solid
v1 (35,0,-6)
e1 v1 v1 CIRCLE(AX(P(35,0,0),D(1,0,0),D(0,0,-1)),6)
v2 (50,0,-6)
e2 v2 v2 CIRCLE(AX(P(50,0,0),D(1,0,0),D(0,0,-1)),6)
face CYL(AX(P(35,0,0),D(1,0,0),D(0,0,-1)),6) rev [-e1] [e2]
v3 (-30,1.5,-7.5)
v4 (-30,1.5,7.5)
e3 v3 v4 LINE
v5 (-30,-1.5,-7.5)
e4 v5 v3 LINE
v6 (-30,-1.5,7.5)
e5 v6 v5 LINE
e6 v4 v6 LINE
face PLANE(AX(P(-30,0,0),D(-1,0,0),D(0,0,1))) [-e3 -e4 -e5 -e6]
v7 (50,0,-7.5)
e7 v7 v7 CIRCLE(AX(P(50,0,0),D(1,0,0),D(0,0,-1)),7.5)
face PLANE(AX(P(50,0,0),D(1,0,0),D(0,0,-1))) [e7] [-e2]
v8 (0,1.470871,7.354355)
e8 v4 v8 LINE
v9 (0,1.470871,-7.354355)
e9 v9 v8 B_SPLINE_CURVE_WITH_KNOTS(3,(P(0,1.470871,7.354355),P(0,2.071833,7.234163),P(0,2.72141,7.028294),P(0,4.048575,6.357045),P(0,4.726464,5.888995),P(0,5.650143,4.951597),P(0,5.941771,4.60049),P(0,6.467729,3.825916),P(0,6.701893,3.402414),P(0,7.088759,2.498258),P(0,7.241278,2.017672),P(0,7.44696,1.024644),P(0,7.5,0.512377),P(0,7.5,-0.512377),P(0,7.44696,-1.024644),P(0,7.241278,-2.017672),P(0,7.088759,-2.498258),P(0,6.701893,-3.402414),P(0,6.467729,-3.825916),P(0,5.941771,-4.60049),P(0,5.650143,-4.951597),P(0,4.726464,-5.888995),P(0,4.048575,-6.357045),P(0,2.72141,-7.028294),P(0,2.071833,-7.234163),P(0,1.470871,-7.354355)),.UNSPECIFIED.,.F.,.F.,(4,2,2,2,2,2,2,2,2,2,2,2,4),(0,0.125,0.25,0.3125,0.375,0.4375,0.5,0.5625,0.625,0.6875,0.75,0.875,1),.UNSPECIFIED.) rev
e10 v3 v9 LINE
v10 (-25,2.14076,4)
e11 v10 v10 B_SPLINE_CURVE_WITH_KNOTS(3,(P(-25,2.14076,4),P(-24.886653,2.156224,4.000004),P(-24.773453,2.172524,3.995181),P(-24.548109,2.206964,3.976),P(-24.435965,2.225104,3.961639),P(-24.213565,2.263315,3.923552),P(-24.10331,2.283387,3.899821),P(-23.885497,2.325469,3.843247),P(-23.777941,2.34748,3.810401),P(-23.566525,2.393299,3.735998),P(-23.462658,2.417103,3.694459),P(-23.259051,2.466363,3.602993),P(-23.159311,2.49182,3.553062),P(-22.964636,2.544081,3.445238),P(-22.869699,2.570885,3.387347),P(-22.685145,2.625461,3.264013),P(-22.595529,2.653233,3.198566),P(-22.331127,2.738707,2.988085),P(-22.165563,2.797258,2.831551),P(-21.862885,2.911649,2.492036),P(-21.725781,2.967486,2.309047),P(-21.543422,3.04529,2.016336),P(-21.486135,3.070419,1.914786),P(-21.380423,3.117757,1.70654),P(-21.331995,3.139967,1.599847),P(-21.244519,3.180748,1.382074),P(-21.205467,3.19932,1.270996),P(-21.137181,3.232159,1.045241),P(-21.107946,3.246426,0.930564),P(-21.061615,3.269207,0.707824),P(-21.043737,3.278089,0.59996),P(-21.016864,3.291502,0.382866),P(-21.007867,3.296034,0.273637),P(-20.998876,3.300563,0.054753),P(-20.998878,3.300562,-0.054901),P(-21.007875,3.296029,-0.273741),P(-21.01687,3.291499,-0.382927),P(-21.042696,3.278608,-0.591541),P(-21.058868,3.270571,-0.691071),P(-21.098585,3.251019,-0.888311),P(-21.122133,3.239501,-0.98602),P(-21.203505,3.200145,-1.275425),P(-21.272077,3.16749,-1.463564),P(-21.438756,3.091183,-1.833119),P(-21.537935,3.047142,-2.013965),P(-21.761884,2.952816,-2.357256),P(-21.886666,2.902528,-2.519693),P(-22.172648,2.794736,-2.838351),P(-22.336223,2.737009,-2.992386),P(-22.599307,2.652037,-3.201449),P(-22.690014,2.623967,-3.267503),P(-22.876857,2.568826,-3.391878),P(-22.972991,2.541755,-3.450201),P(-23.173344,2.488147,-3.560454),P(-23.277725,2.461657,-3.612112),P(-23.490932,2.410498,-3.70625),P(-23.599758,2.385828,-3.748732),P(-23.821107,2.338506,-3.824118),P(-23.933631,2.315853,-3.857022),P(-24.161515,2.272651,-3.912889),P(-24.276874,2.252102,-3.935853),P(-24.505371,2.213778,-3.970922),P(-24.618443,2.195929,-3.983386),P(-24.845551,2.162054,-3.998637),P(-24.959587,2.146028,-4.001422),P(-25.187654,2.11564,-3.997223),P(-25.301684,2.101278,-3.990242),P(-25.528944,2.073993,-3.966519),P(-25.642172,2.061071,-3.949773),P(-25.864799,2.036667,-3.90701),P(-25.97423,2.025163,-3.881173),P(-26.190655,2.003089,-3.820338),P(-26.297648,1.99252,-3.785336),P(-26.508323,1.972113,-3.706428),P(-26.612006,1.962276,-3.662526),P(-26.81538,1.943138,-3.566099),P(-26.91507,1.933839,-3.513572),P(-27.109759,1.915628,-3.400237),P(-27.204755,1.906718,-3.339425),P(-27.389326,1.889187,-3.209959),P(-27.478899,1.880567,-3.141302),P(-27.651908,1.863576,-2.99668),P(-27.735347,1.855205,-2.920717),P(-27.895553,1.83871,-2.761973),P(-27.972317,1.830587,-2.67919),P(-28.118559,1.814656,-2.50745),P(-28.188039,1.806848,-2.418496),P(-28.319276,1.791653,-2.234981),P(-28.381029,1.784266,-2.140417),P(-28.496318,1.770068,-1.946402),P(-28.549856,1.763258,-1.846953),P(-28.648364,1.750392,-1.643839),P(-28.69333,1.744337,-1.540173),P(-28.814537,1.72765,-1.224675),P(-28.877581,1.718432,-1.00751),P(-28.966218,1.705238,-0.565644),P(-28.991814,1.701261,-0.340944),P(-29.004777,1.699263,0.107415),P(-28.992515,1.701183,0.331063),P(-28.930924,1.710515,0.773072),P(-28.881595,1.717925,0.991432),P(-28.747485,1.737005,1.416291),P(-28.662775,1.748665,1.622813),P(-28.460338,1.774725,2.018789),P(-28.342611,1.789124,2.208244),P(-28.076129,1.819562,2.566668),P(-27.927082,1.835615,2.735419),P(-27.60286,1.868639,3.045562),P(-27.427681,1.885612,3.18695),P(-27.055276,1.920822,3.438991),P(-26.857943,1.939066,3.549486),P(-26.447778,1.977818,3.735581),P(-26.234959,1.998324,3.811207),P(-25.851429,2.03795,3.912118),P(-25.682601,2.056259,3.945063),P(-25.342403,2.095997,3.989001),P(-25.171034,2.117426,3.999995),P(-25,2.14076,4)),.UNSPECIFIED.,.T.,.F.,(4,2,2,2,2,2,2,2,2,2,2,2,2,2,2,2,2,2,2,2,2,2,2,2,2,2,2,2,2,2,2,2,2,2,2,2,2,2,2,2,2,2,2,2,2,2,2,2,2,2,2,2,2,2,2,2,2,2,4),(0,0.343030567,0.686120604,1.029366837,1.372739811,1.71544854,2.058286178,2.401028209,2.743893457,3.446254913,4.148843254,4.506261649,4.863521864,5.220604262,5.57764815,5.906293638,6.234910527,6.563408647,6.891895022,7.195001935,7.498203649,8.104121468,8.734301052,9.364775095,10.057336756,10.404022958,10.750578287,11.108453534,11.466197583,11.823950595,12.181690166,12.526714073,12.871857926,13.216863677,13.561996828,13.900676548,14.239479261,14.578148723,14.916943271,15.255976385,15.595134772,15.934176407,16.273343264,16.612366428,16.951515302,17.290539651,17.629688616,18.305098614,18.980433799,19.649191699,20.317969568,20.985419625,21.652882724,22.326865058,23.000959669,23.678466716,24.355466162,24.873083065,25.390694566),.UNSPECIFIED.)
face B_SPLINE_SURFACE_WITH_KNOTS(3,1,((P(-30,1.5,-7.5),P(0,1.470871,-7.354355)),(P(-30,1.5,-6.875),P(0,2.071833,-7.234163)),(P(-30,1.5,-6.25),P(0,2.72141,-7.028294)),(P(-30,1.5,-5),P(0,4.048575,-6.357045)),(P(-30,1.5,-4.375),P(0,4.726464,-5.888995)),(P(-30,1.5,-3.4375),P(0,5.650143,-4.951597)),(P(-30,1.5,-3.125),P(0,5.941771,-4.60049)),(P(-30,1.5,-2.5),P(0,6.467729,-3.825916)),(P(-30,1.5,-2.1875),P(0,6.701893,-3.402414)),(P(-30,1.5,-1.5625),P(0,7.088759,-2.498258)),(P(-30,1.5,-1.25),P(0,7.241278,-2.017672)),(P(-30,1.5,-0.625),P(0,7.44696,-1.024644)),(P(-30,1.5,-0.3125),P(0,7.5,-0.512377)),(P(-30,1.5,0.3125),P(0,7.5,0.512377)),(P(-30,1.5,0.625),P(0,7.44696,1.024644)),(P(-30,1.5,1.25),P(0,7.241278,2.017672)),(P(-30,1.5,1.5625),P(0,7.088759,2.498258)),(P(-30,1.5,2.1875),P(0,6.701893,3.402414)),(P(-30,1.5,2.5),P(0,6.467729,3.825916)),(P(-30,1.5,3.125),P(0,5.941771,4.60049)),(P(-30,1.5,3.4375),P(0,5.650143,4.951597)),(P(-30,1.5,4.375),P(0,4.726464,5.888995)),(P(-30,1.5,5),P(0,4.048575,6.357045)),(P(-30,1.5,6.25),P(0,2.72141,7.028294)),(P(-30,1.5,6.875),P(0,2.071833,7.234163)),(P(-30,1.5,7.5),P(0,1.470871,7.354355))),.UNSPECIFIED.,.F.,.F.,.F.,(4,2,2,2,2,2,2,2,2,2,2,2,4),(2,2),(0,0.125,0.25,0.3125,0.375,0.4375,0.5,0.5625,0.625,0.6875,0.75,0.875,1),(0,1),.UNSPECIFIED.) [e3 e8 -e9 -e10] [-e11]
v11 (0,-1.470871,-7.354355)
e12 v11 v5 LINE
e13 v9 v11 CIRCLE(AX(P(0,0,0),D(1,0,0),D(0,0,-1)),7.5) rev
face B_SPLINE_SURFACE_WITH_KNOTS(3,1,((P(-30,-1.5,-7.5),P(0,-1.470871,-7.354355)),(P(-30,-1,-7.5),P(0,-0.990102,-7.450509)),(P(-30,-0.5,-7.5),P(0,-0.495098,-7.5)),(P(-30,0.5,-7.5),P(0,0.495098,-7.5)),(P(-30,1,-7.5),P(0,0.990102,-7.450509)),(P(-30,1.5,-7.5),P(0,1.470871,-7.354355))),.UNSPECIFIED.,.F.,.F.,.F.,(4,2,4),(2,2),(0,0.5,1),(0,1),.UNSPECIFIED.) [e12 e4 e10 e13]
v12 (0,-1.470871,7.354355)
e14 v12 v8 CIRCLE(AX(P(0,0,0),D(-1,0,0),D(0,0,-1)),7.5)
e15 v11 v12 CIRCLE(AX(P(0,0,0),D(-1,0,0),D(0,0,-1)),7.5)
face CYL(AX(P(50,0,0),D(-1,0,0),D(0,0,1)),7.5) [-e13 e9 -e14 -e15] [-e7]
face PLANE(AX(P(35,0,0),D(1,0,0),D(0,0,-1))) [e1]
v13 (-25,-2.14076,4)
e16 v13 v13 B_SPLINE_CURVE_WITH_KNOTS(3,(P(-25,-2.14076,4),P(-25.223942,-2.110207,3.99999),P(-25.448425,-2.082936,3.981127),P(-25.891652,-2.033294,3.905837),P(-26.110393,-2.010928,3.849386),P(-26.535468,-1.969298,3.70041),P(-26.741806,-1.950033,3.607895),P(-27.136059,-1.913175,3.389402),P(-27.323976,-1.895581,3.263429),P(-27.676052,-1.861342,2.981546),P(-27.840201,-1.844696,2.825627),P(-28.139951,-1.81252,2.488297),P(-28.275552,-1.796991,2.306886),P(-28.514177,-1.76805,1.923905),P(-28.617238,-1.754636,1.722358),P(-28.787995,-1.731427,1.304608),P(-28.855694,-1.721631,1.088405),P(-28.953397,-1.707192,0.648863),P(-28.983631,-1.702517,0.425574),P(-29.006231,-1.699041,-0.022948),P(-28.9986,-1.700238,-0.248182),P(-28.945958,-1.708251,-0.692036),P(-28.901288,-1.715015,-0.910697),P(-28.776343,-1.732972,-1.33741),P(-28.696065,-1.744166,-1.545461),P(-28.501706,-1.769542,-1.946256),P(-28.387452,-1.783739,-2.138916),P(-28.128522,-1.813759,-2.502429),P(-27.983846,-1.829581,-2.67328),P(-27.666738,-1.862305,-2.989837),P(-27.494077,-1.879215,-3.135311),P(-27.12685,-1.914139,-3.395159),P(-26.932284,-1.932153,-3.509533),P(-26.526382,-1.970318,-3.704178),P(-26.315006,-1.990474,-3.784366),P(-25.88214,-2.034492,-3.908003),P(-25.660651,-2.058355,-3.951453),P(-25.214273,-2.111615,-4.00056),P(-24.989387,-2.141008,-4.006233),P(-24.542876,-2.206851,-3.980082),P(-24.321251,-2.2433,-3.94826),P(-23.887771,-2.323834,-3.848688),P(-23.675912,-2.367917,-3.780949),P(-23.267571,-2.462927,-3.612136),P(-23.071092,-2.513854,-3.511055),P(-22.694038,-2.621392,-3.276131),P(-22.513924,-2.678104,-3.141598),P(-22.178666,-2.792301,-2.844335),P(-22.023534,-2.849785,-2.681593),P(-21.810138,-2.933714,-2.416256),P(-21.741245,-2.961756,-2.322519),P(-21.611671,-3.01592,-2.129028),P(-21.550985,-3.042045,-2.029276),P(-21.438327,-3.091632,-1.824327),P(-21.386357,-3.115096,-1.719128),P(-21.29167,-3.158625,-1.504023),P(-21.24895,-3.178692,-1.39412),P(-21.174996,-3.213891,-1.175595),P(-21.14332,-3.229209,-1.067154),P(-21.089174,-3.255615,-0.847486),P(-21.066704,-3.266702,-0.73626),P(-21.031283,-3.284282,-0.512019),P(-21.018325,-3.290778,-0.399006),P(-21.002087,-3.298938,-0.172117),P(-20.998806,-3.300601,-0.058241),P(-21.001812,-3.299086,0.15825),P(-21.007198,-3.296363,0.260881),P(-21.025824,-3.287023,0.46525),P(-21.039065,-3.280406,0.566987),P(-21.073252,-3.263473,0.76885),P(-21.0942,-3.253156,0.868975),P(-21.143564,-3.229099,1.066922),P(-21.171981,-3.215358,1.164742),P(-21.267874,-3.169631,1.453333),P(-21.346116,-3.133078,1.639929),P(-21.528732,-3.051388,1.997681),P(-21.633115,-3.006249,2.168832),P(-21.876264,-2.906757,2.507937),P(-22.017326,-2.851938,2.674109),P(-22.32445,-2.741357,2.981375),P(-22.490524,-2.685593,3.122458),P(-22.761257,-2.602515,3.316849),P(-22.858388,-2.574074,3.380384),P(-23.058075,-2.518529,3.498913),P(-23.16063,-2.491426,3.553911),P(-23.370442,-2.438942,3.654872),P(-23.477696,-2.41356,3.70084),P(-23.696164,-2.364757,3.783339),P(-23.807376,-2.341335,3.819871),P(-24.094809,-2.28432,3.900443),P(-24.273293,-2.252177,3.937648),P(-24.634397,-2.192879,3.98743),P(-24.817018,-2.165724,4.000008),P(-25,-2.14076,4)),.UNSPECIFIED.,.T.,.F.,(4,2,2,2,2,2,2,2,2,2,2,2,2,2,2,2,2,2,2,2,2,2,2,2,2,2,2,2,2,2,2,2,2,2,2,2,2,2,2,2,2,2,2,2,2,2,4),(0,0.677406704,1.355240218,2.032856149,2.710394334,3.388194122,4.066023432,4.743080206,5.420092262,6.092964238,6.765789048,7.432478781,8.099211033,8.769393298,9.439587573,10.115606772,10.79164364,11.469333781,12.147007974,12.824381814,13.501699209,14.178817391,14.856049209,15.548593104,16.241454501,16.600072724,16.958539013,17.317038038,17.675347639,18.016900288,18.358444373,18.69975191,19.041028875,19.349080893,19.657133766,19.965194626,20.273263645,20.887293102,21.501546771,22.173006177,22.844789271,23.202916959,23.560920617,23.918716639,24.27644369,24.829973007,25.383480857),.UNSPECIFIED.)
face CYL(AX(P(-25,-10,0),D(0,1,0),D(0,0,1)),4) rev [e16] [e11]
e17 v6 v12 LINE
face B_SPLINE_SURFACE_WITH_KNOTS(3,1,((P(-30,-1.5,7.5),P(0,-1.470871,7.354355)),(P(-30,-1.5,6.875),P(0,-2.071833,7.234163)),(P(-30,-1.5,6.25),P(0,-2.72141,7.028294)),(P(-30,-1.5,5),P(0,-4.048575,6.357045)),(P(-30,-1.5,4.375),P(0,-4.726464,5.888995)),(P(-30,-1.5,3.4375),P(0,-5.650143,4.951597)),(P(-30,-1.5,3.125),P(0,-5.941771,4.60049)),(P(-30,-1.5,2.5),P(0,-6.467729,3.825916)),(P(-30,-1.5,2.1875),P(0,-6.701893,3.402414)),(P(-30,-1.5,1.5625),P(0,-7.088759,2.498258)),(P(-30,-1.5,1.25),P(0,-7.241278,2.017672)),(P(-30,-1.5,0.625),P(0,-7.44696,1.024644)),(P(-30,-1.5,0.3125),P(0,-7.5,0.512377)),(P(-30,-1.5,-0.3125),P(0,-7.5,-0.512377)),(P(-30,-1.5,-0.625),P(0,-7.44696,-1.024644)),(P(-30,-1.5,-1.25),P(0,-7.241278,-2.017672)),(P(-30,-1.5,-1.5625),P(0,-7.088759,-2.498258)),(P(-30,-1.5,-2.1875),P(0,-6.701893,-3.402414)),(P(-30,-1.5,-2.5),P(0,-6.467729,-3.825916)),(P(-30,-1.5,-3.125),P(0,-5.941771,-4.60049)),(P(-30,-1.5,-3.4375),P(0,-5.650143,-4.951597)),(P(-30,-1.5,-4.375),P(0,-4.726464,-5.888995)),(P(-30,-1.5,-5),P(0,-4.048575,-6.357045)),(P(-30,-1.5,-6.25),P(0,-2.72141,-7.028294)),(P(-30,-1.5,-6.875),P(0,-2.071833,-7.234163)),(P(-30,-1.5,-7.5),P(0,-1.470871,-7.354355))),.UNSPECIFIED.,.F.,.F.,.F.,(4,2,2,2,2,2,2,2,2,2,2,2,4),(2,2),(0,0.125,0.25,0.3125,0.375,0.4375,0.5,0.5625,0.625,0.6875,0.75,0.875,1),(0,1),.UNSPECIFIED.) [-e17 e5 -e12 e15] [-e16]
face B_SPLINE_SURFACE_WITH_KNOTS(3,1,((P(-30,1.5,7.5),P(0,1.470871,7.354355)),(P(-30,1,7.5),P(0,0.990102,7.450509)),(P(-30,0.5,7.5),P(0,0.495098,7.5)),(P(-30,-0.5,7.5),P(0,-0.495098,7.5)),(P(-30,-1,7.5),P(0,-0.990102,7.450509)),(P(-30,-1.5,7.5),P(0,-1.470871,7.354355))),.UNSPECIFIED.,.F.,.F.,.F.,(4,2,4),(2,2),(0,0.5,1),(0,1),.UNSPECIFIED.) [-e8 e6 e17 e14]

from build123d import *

# Parameters (mm, degrees)
SKETCH1_R           = 7.5
BOSS_EXTRUDE1_DEPTH = 50
SKETCH6_R           = 4
CUT_EXTRUDE1_DEPTH  = 10
SKETCH7_R           = 6
CUT_EXTRUDE2_DEPTH  = 15


with BuildPart() as part:
    # Sketch1 → Boss-Extrude1 (new body)
    with BuildSketch(Plane(origin=(0, 0, 0), x_dir=(0, 0, -1), z_dir=(1, 0, 0))):
        Circle(SKETCH1_R)
    extrude(amount=BOSS_EXTRUDE1_DEPTH)

    # Loft1: read off the stored shape, not the designer's step
    # Loft1: loft between two sections, ruled curve by curve
    loft1_from = [
        Edge.make_bspline([(-30, -1.5, -7.5), (-30, -1, -7.5), (-30, -0.5, -7.5), (-30, 0.5, -7.5), (-30, 1, -7.5), (-30, 1.5, -7.5)], [0, 0, 0, 0, 0.5, 0.5, 1, 1, 1, 1], 3),
        Edge.make_bspline([(-30, 1.5, -7.5), (-30, 1.5, -6.875), (-30, 1.5, -6.25), (-30, 1.5, -5), (-30, 1.5, -4.375), (-30, 1.5, -3.4375), (-30, 1.5, -3.125), (-30, 1.5, -2.5), (-30, 1.5, -2.1875), (-30, 1.5, -1.5625), (-30, 1.5, -1.25), (-30, 1.5, -0.625), (-30, 1.5, -0.3125), (-30, 1.5, 0.3125), (-30, 1.5, 0.625), (-30, 1.5, 1.25), (-30, 1.5, 1.5625), (-30, 1.5, 2.1875), (-30, 1.5, 2.5), (-30, 1.5, 3.125), (-30, 1.5, 3.4375), (-30, 1.5, 4.375), (-30, 1.5, 5), (-30, 1.5, 6.25), (-30, 1.5, 6.875), (-30, 1.5, 7.5)], [0, 0, 0, 0, 0.125, 0.125, 0.25, 0.25, 0.3125, 0.3125, 0.375, 0.375, 0.4375, 0.4375, 0.5, 0.5, 0.5625, 0.5625, 0.625, 0.625, 0.6875, 0.6875, 0.75, 0.75, 0.875, 0.875, 1, 1, 1, 1], 3),
        Edge.make_bspline([(-30, -1.5, 7.5), (-30, -1.5, 6.875), (-30, -1.5, 6.25), (-30, -1.5, 5), (-30, -1.5, 4.375), (-30, -1.5, 3.4375), (-30, -1.5, 3.125), (-30, -1.5, 2.5), (-30, -1.5, 2.1875), (-30, -1.5, 1.5625), (-30, -1.5, 1.25), (-30, -1.5, 0.625), (-30, -1.5, 0.3125), (-30, -1.5, -0.3125), (-30, -1.5, -0.625), (-30, -1.5, -1.25), (-30, -1.5, -1.5625), (-30, -1.5, -2.1875), (-30, -1.5, -2.5), (-30, -1.5, -3.125), (-30, -1.5, -3.4375), (-30, -1.5, -4.375), (-30, -1.5, -5), (-30, -1.5, -6.25), (-30, -1.5, -6.875), (-30, -1.5, -7.5)], [0, 0, 0, 0, 0.125, 0.125, 0.25, 0.25, 0.3125, 0.3125, 0.375, 0.375, 0.4375, 0.4375, 0.5, 0.5, 0.5625, 0.5625, 0.625, 0.625, 0.6875, 0.6875, 0.75, 0.75, 0.875, 0.875, 1, 1, 1, 1], 3),
        Edge.make_bspline([(-30, 1.5, 7.5), (-30, 1, 7.5), (-30, 0.5, 7.5), (-30, -0.5, 7.5), (-30, -1, 7.5), (-30, -1.5, 7.5)], [0, 0, 0, 0, 0.5, 0.5, 1, 1, 1, 1], 3),
    ]
    loft1_to = [
        Edge.make_bspline([(0, -1.470871014, -7.354355068), (0, -0.990101783, -7.450508914), (0, -0.495097568, -7.5), (0, 0.495097568, -7.5), (0, 0.990101783, -7.450508914), (0, 1.470871014, -7.354355068)], [0, 0, 0, 0, 0.5, 0.5, 1, 1, 1, 1], 3),
        Edge.make_bspline([(0, 1.470871014, -7.354355068), (0, 2.071832552, -7.23416276), (0, 2.721409951, -7.028293774), (0, 4.048575149, -6.357045286), (0, 4.726464289, -5.888995469), (0, 5.65014307, -4.951597355), (0, 5.941771026, -4.600489776), (0, 6.467728892, -3.825915851), (0, 6.701892794, -3.402414461), (0, 7.088758699, -2.498257653), (0, 7.24127756, -2.017672373), (0, 7.446959564, -1.024644209), (0, 7.5, -0.512377439), (0, 7.5, 0.512377439), (0, 7.446959564, 1.024644209), (0, 7.24127756, 2.017672373), (0, 7.088758699, 2.498257653), (0, 6.701892794, 3.402414461), (0, 6.467728892, 3.825915851), (0, 5.941771026, 4.600489776), (0, 5.65014307, 4.951597355), (0, 4.726464289, 5.888995469), (0, 4.048575149, 6.357045286), (0, 2.721409951, 7.028293774), (0, 2.071832552, 7.23416276), (0, 1.470871014, 7.354355068)], [0, 0, 0, 0, 0.125, 0.125, 0.25, 0.25, 0.3125, 0.3125, 0.375, 0.375, 0.4375, 0.4375, 0.5, 0.5, 0.5625, 0.5625, 0.625, 0.625, 0.6875, 0.6875, 0.75, 0.75, 0.875, 0.875, 1, 1, 1, 1], 3),
        Edge.make_bspline([(0, -1.470871014, 7.354355068), (0, -2.071832552, 7.23416276), (0, -2.721409951, 7.028293774), (0, -4.048575149, 6.357045286), (0, -4.726464289, 5.888995469), (0, -5.65014307, 4.951597355), (0, -5.941771026, 4.600489776), (0, -6.467728892, 3.825915851), (0, -6.701892794, 3.402414461), (0, -7.088758699, 2.498257653), (0, -7.24127756, 2.017672373), (0, -7.446959564, 1.024644209), (0, -7.5, 0.512377439), (0, -7.5, -0.512377439), (0, -7.446959564, -1.024644209), (0, -7.24127756, -2.017672373), (0, -7.088758699, -2.498257653), (0, -6.701892794, -3.402414461), (0, -6.467728892, -3.825915851), (0, -5.941771026, -4.600489776), (0, -5.65014307, -4.951597355), (0, -4.726464289, -5.888995469), (0, -4.048575149, -6.357045286), (0, -2.721409951, -7.028293774), (0, -2.071832552, -7.23416276), (0, -1.470871014, -7.354355068)], [0, 0, 0, 0, 0.125, 0.125, 0.25, 0.25, 0.3125, 0.3125, 0.375, 0.375, 0.4375, 0.4375, 0.5, 0.5, 0.5625, 0.5625, 0.625, 0.625, 0.6875, 0.6875, 0.75, 0.75, 0.875, 0.875, 1, 1, 1, 1], 3),
        Edge.make_bspline([(0, 1.470871014, 7.354355068), (0, 0.990101783, 7.450508914), (0, 0.495097568, 7.5), (0, -0.495097568, 7.5), (0, -0.990101783, 7.450508914), (0, -1.470871014, 7.354355068)], [0, 0, 0, 0, 0.5, 0.5, 1, 1, 1, 1], 3),
    ]
    loft1 = Solid(Shell([*[Face.make_surface_from_curves(loft1_from[k], loft1_to[k]) for k in range(4)], Face(Wire(loft1_from)), Face(Wire(loft1_to))]))
    add(loft1)

    # Sketch6 → Cut-Extrude1 (cut, symmetric)
    with BuildSketch(Plane(origin=(0, 0, 0), x_dir=(1, 0, 0), z_dir=(0, 1, 0))):
        with Locations(Location((-25, 0, 0), (0, 0, 270))):
            Circle(SKETCH6_R)
    extrude(amount=CUT_EXTRUDE1_DEPTH, both=True, mode=Mode.SUBTRACT)

    # Sketch7 → Cut-Extrude2 (cut)
    with BuildSketch(Plane(origin=(50, 0, 0), x_dir=(0, 0, -1), z_dir=(1, 0, 0))):
        Circle(SKETCH7_R)
    extrude(amount=-CUT_EXTRUDE2_DEPTH, mode=Mode.SUBTRACT)


solid = part.part
